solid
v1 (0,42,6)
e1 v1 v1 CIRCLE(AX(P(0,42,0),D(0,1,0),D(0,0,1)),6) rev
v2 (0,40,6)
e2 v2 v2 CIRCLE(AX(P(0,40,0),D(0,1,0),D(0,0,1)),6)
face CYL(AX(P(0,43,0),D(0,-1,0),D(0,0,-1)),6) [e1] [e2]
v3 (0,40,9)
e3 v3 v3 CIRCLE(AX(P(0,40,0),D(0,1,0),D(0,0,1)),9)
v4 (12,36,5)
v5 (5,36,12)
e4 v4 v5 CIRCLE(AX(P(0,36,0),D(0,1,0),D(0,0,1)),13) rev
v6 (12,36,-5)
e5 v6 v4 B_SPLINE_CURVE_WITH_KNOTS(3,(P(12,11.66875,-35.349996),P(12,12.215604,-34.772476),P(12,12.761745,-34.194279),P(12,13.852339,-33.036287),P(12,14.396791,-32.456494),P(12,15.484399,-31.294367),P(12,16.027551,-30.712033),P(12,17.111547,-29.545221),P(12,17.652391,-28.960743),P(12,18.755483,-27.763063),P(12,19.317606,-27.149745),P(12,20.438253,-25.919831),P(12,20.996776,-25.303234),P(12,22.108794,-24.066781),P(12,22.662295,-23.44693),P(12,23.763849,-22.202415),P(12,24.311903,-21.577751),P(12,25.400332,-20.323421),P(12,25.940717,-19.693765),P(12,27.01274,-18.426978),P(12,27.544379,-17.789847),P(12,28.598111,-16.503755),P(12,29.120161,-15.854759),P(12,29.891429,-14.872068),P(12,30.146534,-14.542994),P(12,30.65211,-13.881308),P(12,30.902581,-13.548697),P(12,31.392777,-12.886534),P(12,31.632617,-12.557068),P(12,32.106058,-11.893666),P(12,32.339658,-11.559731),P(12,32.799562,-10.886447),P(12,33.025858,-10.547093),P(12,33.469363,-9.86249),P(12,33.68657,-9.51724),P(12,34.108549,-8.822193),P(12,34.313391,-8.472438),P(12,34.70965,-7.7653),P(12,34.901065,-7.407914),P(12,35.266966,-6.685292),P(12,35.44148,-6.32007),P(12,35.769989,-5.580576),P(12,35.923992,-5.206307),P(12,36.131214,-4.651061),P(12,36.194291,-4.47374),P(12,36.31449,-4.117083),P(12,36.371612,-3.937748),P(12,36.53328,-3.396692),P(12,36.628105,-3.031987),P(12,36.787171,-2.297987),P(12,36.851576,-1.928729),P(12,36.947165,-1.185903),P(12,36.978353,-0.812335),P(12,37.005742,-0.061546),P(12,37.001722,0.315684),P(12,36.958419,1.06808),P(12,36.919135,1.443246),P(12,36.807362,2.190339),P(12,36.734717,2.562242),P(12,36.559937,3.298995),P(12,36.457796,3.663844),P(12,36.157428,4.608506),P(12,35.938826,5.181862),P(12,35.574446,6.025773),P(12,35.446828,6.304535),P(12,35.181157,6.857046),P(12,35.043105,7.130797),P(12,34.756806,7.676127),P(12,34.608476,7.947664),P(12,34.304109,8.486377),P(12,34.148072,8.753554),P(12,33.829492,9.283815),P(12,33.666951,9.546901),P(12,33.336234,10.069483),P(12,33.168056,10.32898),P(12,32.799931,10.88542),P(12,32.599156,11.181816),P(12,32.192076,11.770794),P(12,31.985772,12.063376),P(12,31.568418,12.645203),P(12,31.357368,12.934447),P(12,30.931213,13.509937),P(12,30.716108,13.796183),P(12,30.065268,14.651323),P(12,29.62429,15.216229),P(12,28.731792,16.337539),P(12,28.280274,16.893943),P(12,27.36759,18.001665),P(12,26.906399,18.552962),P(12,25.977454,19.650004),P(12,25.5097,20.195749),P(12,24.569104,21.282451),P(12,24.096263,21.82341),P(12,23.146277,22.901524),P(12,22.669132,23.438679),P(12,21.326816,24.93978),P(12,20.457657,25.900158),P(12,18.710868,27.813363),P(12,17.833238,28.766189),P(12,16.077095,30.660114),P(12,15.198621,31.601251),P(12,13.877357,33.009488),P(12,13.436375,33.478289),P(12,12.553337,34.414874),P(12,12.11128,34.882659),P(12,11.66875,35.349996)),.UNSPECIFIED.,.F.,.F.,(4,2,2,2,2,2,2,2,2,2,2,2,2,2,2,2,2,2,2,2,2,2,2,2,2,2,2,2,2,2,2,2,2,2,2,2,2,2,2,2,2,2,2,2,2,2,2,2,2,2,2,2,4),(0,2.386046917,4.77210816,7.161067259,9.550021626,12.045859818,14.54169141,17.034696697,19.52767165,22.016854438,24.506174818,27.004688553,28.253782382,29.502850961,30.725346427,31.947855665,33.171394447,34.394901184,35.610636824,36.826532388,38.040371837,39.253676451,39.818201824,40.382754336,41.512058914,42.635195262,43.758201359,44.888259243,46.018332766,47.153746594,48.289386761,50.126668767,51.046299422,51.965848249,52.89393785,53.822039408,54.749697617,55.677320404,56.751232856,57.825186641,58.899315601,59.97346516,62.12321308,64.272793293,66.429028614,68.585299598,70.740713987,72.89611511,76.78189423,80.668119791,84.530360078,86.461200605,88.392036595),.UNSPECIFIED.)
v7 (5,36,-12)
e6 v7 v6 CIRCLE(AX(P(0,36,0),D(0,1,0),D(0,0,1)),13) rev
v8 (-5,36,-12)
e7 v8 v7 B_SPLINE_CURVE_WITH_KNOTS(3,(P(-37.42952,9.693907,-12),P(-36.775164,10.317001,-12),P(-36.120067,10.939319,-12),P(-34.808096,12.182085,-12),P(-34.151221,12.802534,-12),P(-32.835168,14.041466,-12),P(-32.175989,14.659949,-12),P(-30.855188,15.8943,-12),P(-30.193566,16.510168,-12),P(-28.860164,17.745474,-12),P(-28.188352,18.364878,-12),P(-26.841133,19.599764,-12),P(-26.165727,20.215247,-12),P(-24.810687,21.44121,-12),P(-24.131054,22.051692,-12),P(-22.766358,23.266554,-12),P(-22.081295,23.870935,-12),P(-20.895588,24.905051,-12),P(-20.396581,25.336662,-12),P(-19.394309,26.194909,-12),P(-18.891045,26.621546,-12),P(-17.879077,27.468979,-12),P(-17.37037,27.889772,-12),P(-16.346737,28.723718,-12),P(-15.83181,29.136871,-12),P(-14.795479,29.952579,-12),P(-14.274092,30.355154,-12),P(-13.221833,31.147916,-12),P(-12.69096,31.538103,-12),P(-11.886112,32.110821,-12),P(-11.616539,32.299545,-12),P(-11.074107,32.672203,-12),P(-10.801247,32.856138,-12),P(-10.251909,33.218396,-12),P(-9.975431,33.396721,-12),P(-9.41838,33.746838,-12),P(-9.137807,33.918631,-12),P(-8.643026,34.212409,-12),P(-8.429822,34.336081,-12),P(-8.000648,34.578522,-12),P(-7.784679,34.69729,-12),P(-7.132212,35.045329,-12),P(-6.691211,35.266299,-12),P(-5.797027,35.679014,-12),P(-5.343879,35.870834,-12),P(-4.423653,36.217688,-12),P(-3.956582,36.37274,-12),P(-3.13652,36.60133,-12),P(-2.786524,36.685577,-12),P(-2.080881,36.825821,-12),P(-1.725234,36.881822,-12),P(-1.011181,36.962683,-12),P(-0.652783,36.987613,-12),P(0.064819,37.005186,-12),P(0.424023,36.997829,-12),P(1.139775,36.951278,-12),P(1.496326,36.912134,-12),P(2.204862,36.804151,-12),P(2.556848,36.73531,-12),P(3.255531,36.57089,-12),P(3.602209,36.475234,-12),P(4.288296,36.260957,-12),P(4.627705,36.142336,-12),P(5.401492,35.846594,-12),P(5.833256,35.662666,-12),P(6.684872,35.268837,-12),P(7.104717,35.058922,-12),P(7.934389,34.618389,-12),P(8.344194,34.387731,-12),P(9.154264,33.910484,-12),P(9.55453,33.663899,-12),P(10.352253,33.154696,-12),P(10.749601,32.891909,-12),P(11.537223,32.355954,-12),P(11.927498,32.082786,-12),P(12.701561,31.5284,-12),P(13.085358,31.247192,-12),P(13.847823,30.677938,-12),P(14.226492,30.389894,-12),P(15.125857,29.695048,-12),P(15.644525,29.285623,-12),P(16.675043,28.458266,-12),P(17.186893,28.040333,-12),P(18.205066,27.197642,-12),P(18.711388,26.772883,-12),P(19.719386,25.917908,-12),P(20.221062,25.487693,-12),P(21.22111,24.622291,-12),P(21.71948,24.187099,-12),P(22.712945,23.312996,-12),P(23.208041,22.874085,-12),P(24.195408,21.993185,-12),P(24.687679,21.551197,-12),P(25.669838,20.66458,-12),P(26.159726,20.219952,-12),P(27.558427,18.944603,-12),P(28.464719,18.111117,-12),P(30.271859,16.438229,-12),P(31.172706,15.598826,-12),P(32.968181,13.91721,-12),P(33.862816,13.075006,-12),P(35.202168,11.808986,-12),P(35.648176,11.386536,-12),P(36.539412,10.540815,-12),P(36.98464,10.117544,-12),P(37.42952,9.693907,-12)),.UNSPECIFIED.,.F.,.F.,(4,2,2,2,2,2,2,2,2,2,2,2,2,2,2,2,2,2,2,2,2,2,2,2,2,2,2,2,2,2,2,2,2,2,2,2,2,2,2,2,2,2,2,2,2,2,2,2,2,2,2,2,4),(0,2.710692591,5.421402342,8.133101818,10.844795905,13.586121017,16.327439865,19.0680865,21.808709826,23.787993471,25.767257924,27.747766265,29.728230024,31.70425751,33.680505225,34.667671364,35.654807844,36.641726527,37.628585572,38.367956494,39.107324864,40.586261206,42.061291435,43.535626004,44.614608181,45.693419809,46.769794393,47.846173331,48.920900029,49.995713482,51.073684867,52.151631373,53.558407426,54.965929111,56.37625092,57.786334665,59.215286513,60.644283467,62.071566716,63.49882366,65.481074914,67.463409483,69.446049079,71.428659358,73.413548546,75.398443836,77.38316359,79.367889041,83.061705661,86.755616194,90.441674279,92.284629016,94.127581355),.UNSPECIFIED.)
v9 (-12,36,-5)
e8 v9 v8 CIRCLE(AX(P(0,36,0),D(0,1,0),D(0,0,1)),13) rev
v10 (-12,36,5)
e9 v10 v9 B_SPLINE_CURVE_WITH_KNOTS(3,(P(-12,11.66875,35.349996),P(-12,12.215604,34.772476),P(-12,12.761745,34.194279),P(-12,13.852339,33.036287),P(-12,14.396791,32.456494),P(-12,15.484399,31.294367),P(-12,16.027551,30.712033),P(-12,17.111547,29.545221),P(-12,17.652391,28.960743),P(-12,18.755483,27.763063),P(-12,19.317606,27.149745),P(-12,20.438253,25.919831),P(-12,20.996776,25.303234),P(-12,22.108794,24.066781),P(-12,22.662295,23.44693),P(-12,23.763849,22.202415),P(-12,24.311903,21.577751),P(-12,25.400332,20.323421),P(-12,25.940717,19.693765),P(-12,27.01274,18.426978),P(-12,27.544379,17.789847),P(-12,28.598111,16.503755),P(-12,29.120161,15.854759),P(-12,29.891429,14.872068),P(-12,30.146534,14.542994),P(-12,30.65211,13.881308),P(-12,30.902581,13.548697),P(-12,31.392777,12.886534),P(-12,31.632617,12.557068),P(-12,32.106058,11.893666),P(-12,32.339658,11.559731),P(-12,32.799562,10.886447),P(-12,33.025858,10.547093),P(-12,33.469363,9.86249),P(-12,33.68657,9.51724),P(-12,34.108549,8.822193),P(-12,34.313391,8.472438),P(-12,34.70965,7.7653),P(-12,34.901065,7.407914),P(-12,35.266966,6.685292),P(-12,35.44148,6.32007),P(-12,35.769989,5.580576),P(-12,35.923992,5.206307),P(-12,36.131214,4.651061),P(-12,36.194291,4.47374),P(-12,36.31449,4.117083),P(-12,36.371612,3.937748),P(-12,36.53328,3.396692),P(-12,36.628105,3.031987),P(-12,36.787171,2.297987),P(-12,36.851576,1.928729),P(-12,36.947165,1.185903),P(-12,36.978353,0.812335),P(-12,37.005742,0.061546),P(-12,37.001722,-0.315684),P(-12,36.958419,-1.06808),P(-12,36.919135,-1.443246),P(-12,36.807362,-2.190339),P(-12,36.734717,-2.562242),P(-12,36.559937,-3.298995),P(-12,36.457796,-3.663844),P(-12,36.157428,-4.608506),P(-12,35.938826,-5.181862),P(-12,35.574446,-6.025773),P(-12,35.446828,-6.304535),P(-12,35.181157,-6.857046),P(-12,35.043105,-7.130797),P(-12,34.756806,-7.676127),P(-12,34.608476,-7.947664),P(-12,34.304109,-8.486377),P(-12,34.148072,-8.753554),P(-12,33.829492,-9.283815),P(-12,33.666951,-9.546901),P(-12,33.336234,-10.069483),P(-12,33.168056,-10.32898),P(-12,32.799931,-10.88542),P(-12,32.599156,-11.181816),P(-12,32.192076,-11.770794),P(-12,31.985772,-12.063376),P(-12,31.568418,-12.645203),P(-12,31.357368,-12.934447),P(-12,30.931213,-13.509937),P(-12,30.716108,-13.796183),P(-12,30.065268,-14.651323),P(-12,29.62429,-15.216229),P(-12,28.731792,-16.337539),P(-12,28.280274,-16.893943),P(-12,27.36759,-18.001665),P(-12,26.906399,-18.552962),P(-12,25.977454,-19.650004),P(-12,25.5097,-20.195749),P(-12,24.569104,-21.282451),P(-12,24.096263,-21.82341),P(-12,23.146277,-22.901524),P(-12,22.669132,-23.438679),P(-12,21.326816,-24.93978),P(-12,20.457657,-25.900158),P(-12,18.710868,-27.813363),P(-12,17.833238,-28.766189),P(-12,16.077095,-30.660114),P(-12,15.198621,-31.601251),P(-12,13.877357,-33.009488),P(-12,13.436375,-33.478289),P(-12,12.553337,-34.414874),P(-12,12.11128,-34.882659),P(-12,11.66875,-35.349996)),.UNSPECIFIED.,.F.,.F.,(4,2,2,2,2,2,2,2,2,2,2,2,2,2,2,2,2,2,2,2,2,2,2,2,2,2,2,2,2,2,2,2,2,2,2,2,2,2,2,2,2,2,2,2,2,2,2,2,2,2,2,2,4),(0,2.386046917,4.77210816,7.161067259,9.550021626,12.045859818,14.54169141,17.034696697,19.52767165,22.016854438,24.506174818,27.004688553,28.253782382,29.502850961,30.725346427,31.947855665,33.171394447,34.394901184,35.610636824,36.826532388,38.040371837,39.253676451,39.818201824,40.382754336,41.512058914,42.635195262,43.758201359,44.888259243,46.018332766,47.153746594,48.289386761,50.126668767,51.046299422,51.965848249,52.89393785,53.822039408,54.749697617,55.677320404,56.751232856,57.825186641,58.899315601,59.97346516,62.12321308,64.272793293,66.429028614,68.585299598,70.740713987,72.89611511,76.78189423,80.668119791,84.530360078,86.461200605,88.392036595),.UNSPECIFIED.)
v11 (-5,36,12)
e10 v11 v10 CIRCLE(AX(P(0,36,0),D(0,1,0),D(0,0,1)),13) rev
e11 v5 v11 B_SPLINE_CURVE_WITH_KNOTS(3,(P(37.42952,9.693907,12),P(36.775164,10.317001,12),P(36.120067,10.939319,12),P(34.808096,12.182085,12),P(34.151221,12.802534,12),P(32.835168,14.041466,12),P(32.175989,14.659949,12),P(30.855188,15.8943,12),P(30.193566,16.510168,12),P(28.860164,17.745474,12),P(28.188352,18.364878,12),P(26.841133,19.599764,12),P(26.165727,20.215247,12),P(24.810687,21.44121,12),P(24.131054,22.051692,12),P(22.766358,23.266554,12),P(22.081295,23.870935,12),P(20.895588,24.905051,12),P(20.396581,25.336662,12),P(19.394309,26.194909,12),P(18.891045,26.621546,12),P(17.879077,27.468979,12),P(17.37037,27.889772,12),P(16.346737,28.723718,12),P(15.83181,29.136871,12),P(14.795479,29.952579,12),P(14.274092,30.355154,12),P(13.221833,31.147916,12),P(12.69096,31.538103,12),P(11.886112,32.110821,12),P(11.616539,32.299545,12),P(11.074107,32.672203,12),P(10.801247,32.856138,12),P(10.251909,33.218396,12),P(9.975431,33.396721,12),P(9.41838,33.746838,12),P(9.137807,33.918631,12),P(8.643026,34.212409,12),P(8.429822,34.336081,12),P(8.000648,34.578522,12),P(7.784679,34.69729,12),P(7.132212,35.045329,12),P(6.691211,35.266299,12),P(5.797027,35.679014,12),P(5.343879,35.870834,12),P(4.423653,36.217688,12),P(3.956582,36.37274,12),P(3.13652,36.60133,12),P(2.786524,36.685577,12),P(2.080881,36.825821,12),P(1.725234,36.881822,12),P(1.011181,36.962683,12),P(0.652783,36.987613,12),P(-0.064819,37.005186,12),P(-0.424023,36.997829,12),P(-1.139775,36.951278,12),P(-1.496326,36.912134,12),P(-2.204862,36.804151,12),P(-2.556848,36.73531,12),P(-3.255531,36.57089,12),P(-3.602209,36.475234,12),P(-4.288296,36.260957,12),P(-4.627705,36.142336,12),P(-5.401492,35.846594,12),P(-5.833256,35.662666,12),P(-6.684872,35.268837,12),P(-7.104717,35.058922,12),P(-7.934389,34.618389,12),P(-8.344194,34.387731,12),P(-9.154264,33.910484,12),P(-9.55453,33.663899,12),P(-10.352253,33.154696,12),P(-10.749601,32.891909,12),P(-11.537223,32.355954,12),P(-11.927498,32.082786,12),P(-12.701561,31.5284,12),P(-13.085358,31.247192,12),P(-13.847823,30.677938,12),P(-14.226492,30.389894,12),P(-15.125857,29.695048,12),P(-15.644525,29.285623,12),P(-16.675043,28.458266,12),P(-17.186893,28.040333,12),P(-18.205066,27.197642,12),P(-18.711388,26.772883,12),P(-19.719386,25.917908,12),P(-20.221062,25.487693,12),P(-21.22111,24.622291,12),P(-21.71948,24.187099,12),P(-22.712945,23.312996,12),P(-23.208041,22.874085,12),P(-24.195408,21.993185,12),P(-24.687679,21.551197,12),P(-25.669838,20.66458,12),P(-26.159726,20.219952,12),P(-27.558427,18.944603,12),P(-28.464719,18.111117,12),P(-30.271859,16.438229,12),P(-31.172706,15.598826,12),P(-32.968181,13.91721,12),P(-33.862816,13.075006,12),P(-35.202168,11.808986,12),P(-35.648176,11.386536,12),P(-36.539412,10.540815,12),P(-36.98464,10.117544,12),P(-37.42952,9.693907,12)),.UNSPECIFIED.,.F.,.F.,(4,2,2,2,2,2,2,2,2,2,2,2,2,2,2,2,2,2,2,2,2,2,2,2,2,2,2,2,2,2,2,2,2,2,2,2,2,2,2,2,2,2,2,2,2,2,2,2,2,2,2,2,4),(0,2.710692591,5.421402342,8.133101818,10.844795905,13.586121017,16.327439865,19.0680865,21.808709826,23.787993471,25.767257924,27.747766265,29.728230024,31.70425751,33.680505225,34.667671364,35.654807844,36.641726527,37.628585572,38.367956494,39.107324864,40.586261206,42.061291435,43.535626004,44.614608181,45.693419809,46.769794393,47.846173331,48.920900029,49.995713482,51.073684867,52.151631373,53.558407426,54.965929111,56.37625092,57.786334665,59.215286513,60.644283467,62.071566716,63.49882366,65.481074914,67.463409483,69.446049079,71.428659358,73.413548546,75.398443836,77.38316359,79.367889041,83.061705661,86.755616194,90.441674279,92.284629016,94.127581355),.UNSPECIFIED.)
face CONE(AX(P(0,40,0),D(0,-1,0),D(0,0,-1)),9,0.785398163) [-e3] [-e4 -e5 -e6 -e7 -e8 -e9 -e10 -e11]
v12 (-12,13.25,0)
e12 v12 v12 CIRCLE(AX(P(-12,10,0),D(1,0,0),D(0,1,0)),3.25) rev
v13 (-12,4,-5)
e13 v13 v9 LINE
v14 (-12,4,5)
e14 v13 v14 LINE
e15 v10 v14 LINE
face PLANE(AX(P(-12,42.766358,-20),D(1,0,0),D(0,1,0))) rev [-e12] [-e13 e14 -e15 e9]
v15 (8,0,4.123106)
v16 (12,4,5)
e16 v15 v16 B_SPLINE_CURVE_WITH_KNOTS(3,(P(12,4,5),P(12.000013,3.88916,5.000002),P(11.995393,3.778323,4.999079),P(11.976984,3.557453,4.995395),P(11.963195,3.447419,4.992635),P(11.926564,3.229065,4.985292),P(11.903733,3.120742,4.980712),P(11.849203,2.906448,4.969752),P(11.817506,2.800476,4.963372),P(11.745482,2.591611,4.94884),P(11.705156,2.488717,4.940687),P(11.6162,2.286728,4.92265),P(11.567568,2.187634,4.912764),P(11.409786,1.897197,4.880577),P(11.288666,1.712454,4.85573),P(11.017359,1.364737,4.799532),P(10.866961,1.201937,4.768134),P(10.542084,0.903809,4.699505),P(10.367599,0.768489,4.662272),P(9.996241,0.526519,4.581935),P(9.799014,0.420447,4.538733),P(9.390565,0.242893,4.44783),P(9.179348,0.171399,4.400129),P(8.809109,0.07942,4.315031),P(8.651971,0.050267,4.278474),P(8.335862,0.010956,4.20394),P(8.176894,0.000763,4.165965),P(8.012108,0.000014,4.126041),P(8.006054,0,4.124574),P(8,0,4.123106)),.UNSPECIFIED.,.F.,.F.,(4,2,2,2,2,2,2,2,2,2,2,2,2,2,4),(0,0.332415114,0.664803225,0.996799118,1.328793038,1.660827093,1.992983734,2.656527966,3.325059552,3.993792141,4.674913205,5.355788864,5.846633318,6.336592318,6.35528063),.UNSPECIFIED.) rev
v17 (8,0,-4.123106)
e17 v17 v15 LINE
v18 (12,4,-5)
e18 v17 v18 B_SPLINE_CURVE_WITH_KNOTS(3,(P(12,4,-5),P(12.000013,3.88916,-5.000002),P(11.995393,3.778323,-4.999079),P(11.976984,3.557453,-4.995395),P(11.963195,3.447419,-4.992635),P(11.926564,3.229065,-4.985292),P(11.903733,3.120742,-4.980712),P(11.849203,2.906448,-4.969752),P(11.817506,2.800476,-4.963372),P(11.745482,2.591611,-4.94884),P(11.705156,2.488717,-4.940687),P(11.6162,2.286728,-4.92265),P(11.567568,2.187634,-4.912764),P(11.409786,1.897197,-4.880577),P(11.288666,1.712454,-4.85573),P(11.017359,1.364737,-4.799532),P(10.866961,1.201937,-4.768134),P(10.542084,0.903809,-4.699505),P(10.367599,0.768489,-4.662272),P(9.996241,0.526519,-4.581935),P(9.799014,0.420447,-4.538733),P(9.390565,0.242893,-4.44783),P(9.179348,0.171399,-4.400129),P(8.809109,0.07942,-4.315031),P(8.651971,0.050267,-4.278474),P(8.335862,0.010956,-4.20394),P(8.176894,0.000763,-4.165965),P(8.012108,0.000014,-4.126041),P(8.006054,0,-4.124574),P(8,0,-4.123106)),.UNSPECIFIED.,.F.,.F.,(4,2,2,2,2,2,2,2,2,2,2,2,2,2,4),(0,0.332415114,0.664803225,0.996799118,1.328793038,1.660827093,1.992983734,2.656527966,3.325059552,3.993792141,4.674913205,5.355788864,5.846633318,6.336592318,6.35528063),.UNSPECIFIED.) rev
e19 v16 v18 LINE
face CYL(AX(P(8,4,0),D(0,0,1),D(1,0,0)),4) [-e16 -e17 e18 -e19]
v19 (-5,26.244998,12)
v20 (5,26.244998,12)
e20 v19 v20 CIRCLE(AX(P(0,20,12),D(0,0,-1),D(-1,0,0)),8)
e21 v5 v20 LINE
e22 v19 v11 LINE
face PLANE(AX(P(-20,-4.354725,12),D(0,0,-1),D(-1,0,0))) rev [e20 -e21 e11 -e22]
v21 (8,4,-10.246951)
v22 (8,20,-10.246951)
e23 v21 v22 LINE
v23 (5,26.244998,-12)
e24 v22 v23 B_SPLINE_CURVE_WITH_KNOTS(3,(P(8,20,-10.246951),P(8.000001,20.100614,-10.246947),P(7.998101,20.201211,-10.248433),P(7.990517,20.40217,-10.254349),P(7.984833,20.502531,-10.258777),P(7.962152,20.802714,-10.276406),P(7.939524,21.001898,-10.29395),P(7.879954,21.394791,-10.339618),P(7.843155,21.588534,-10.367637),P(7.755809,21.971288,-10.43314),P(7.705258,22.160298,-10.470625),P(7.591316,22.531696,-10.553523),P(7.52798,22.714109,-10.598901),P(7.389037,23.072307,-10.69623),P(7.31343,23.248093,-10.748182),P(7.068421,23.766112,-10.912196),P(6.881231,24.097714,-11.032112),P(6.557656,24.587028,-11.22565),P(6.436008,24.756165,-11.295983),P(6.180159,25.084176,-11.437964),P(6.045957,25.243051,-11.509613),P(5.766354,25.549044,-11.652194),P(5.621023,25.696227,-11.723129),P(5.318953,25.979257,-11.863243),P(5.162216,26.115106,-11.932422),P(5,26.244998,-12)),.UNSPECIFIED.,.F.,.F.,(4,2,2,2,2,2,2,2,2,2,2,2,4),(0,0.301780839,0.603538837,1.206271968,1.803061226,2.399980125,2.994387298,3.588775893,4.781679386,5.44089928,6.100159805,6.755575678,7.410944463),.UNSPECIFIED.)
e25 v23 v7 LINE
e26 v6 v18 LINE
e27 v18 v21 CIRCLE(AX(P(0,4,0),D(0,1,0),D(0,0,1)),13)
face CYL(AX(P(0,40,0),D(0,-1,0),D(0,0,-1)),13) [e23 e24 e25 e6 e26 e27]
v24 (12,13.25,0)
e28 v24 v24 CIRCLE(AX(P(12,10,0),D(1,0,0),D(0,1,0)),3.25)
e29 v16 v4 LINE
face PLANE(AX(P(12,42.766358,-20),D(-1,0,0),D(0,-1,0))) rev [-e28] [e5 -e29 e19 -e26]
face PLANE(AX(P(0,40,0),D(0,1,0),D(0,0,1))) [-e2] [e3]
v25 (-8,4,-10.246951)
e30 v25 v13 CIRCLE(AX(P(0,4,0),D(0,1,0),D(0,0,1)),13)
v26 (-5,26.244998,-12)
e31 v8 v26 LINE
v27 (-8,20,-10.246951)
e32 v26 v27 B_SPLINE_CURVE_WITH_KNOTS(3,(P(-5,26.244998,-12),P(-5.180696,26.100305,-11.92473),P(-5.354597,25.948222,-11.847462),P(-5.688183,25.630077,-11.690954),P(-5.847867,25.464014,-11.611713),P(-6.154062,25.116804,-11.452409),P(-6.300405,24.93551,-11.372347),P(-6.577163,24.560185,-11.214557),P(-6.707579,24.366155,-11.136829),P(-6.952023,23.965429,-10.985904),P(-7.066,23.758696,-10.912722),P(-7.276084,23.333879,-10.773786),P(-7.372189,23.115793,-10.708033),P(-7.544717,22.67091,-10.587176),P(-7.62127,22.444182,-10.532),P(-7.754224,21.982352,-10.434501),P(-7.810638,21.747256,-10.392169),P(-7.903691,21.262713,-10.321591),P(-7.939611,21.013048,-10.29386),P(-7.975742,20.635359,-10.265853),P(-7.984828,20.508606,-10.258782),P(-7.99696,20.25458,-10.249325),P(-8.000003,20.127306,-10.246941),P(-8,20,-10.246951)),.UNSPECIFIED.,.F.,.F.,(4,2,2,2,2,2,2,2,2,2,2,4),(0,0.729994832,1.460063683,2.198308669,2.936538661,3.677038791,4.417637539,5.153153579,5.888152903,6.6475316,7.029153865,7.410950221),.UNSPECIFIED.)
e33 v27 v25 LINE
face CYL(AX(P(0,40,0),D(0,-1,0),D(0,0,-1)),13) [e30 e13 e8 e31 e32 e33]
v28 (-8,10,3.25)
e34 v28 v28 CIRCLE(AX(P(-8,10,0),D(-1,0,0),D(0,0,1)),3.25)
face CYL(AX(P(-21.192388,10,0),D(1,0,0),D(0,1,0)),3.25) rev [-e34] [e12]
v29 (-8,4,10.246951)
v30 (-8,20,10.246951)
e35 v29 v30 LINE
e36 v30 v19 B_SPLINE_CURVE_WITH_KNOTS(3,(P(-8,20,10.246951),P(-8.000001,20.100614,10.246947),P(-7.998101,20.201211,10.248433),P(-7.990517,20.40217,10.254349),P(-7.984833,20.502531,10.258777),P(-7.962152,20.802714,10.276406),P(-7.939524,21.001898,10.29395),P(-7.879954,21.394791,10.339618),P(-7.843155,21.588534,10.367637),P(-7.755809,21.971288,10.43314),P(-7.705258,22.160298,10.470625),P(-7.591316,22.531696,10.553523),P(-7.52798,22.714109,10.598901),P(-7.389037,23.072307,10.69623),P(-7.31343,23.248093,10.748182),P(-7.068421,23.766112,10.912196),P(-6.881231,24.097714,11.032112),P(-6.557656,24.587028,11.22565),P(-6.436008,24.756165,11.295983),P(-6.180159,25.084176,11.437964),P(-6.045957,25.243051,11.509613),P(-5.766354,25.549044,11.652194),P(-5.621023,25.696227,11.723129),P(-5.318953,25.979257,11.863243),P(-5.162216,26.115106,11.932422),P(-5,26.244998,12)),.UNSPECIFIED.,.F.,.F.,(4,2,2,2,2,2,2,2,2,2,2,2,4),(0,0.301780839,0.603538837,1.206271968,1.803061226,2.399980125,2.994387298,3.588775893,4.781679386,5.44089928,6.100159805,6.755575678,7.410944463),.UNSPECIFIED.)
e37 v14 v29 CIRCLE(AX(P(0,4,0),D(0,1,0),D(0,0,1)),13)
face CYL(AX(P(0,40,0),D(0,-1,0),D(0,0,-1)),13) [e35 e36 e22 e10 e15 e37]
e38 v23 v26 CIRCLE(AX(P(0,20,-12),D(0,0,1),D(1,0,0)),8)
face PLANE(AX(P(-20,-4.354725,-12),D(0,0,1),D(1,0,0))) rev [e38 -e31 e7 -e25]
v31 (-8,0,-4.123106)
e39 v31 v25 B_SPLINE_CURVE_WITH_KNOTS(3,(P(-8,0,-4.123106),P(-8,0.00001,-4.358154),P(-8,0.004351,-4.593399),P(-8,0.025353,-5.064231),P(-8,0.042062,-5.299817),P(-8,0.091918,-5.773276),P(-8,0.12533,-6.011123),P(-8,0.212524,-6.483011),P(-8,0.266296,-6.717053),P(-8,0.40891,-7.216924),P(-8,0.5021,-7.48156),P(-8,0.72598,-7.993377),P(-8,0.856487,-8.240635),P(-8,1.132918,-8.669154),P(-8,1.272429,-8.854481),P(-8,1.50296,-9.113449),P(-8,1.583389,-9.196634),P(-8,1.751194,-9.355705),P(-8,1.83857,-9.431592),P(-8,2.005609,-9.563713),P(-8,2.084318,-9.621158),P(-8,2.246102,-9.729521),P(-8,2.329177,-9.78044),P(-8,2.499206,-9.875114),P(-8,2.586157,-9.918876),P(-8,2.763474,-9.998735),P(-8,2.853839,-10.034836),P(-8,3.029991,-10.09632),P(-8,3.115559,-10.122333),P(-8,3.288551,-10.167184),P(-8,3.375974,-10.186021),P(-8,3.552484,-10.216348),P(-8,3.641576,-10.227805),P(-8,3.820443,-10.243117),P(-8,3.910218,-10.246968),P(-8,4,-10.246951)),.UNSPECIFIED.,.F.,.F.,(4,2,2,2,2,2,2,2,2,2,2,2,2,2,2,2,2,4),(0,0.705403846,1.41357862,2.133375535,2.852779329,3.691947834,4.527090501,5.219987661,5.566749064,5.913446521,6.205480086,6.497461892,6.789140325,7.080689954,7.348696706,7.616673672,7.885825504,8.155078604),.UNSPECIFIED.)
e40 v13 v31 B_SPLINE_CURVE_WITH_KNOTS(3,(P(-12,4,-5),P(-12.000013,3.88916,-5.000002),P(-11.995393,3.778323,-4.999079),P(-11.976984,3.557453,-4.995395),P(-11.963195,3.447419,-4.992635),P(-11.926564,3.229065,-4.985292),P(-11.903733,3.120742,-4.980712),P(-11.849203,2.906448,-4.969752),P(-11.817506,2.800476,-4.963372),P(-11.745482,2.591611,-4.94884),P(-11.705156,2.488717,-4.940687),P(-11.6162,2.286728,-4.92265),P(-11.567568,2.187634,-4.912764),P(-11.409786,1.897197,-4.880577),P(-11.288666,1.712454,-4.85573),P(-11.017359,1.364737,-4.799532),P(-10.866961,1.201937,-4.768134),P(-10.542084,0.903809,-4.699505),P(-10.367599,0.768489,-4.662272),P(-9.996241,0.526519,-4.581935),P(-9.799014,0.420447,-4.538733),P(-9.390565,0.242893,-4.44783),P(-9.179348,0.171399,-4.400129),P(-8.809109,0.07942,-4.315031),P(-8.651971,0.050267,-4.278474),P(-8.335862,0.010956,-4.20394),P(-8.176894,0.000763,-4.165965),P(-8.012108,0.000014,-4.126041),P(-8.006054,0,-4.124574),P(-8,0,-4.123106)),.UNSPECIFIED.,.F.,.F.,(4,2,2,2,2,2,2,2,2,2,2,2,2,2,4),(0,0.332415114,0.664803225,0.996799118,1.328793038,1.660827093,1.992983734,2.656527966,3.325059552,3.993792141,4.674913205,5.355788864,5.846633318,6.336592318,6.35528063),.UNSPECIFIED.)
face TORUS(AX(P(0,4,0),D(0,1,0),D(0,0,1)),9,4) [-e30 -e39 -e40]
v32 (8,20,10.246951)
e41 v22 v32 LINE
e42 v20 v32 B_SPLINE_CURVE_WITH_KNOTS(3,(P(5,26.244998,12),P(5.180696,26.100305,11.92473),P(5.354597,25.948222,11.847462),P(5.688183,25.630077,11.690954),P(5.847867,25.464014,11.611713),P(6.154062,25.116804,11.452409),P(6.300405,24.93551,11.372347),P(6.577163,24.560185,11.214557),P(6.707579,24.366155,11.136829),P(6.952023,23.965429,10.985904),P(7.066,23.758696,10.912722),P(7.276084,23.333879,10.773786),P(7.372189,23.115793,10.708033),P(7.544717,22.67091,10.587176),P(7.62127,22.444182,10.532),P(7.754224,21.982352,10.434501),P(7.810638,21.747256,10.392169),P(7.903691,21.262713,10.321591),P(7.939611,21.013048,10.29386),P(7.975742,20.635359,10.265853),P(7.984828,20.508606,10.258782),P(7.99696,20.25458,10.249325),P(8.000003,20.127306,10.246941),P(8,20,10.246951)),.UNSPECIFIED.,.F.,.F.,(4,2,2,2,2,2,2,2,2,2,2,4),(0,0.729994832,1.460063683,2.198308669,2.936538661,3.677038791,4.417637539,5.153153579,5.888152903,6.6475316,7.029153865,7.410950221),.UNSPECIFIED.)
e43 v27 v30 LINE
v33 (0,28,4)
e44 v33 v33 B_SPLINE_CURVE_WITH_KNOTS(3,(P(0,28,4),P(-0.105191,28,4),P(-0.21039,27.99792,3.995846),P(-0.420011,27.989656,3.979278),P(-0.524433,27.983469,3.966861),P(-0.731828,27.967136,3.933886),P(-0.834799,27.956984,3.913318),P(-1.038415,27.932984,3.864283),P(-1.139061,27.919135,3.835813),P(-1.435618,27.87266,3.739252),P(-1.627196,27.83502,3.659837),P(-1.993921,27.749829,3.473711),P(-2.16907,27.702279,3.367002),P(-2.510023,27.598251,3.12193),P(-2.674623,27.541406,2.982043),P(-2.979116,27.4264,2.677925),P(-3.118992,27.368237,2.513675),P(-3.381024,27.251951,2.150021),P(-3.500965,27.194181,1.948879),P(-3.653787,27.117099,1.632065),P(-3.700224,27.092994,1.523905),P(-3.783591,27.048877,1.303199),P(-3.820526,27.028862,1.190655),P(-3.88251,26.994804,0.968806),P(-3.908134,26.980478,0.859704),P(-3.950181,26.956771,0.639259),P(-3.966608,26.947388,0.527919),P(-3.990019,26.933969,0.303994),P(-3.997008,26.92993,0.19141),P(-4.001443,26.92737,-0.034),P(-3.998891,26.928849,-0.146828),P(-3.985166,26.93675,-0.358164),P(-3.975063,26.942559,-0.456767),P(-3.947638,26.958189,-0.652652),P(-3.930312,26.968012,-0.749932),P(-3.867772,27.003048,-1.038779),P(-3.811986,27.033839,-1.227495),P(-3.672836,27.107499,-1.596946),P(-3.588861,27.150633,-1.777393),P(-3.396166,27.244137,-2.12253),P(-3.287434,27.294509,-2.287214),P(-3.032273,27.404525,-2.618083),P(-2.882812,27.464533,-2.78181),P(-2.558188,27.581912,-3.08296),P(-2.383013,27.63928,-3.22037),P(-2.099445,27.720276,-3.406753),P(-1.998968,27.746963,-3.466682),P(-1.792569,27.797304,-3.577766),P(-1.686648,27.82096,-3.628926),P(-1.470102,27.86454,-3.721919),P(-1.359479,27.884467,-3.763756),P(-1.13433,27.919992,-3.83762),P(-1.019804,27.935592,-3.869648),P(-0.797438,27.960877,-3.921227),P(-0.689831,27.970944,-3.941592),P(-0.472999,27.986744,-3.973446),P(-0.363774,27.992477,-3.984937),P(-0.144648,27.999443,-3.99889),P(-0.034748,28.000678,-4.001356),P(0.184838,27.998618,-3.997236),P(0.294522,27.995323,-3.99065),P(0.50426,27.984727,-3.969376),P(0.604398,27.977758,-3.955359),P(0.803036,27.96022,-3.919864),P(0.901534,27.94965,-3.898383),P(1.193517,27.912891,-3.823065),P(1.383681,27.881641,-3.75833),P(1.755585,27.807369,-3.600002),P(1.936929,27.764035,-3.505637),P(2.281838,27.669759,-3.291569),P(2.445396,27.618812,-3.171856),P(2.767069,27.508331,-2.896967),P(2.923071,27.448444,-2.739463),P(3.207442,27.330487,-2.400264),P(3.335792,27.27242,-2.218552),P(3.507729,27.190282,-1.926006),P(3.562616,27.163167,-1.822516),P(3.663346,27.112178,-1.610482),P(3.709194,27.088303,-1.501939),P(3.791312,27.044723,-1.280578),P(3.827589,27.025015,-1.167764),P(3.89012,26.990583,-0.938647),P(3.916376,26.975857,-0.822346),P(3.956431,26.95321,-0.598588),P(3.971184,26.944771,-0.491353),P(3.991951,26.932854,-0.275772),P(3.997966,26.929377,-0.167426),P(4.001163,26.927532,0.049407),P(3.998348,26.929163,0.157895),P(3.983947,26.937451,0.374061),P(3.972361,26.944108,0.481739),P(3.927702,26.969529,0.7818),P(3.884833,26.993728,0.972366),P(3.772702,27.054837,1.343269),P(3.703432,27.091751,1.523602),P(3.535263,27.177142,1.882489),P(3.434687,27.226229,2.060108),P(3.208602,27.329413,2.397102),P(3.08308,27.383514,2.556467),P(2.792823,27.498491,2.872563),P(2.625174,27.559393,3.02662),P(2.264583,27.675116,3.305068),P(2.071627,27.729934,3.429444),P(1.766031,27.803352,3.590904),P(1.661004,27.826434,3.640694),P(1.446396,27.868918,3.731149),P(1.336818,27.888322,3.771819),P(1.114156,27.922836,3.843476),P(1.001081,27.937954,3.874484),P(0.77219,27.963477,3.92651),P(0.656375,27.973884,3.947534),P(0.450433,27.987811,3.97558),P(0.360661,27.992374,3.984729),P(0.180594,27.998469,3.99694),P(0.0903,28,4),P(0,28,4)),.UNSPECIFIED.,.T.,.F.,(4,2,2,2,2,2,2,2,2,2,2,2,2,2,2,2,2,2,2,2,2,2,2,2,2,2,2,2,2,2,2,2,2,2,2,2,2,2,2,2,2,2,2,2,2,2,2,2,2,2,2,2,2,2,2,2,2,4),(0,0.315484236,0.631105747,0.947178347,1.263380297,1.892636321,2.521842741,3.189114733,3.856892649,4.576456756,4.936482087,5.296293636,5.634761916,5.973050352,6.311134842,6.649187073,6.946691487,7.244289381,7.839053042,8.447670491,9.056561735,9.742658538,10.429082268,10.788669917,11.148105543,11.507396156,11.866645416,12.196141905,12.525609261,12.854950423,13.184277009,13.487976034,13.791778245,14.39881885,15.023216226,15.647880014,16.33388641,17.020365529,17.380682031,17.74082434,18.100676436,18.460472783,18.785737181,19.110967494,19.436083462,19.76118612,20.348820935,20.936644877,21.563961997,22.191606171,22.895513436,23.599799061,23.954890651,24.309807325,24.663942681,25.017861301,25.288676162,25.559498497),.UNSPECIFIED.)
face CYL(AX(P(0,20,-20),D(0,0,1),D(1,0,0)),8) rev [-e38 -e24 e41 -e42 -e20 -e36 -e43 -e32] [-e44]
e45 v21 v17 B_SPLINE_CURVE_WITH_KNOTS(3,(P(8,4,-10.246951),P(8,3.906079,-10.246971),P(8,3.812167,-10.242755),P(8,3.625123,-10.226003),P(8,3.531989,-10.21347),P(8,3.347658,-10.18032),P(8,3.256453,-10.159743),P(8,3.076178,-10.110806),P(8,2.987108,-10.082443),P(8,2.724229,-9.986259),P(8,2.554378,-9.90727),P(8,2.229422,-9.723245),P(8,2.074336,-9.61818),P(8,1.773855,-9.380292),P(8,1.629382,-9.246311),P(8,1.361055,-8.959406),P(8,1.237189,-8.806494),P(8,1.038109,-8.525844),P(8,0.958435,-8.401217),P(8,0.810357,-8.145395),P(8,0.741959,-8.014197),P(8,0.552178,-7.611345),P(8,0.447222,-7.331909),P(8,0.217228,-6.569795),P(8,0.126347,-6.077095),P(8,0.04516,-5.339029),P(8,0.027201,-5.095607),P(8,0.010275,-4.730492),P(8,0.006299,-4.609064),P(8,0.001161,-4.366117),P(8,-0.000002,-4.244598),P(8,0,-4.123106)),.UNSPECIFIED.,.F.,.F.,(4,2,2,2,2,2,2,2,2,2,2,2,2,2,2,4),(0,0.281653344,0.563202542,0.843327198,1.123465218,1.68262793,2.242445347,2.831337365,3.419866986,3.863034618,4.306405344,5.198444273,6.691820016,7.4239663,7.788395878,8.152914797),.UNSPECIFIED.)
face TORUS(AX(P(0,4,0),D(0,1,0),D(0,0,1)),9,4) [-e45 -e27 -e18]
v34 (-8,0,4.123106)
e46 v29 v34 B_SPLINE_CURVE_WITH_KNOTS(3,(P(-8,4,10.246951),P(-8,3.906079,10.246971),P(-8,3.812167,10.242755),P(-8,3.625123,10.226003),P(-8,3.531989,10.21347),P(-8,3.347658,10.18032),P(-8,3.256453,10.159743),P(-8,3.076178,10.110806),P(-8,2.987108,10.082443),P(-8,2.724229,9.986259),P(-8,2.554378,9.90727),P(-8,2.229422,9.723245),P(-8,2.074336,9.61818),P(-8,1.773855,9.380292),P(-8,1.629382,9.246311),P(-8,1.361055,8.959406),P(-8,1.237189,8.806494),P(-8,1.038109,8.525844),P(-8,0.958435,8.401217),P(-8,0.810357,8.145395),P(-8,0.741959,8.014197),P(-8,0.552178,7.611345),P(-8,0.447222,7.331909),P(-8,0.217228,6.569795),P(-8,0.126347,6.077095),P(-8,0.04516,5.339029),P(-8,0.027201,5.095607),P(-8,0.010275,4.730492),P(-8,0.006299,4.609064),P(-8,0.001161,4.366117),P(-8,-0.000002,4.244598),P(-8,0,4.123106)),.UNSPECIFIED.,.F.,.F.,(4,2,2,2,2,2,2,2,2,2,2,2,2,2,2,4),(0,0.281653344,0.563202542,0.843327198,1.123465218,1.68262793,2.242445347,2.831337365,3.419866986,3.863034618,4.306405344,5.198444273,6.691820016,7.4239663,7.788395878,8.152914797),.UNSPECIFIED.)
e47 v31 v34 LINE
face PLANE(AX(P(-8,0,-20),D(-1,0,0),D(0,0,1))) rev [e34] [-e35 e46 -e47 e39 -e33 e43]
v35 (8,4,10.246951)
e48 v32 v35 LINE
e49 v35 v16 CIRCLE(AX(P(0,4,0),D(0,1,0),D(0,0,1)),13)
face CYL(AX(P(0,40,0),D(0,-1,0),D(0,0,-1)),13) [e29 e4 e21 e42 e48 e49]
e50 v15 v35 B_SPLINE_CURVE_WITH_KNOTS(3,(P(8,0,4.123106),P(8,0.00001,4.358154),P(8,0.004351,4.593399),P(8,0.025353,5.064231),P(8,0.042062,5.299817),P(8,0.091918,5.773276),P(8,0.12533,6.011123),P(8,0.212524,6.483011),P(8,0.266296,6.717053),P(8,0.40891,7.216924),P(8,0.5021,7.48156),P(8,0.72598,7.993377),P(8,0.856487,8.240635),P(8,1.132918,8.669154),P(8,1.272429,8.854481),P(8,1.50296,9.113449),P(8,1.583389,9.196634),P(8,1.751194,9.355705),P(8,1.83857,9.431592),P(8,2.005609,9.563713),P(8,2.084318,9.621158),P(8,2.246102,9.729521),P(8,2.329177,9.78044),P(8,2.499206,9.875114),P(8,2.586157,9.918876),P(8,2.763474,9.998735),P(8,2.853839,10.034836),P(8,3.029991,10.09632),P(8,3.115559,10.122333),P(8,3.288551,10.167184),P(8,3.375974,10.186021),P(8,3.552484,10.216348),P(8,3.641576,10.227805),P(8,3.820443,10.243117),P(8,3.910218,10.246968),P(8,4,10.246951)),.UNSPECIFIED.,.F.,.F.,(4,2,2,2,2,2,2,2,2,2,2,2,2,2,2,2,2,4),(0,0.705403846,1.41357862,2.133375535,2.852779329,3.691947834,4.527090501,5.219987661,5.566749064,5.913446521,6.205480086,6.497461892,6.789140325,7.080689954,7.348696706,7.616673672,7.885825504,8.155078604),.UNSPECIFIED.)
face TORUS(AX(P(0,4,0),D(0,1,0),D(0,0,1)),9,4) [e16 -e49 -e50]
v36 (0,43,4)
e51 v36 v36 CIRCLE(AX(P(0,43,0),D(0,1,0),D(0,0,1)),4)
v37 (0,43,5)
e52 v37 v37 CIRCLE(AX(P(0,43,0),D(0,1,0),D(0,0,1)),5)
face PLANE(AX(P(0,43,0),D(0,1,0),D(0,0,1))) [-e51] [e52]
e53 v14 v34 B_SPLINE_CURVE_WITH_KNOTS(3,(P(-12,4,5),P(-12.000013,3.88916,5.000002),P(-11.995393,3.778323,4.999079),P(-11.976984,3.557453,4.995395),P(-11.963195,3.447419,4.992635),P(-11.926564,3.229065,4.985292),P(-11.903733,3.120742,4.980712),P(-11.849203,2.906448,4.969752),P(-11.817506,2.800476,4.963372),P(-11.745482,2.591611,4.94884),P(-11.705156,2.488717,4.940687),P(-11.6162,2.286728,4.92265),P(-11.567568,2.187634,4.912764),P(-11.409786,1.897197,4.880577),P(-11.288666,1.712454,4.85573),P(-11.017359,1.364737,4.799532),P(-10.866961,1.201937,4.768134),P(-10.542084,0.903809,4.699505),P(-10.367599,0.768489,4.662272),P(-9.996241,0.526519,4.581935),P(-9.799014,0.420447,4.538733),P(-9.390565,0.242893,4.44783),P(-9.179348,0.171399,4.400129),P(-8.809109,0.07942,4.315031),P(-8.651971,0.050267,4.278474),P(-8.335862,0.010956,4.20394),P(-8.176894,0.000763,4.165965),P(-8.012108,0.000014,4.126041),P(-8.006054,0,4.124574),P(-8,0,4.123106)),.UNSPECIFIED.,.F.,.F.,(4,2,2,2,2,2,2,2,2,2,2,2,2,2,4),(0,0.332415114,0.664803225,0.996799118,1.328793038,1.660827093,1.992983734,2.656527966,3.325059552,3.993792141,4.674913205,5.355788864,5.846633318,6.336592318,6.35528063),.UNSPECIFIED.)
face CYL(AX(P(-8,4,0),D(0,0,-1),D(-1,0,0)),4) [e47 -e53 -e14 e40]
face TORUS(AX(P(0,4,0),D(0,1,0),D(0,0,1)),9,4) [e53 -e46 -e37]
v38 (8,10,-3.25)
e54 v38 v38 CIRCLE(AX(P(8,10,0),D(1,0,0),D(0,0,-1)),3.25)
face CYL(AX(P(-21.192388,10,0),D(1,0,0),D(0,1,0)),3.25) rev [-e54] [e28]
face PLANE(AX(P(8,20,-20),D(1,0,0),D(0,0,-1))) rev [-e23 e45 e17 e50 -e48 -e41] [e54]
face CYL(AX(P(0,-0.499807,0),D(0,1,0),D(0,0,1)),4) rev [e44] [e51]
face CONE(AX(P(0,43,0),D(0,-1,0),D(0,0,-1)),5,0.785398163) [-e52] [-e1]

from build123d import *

# Parameters (mm, degrees)
SKETCH1_R               = 13
BOSS_EXTRUDE1_DEPTH     = 40
CHAMFER1_SIZE           = 4
SKETCH2_W               = 9.245775376
SKETCH2_H               = 49.025160165
CUT_EXTRUDE1_DEPTH      = 20
SKETCH3_W               = 9.286622431
SKETCH3_H               = 52.181973662
CUT_EXTRUDE2_DEPTH      = 20
CUT_EXTRUDE3_DEPTH      = 20
FILLET9_R               = 4
CUT_EXTRUDE4_REACH      = 50.166
SKETCH5_R               = 3.25
SKETCH6_R               = 6
BOSS_EXTRUDE2_DEPTH     = 3
CUT_EXTRUDE5_REACH      = 48.228
CUT_EXTRUDE5_END_RADIUS = 8
SKETCH7_R               = 4
CHAMFER2_SIZE           = 1


with BuildPart() as part:
    # Sketch1 → Boss-Extrude1 (new body)
    with BuildSketch(Plane(origin=(0, 0, 0), x_dir=(1, 0, 0), z_dir=(0, 1, 0))):
        with Locations(Location((0, 0, 0), (0, 0, 270))):
            Circle(SKETCH1_R)
    extrude(amount=BOSS_EXTRUDE1_DEPTH)

    # Chamfer1
    chamfer1_edges = [part.edges().sort_by_distance(p)[0] for p in [
        (0, 40, -13),
    ]]
    chamfer(chamfer1_edges, length=CHAMFER1_SIZE)

    # Sketch2 → Cut-Extrude1 (cut, symmetric)
    with BuildSketch(Plane(origin=(0, 0, 0), x_dir=(0, 0, -1), z_dir=(1, 0, 0))):
        with Locations((-16.622887688, 20.157854701)):
            Rectangle(SKETCH2_W, SKETCH2_H)
        with Locations((16.622887688, 20.157854701)):
            Rectangle(SKETCH2_W, SKETCH2_H)
    extrude(amount=CUT_EXTRUDE1_DEPTH, both=True, mode=Mode.SUBTRACT)

    # Sketch3 → Cut-Extrude2 (cut, symmetric)
    with BuildSketch(Plane.XY):
        with Locations((16.643311215, 16.67537129)):
            Rectangle(SKETCH3_W, SKETCH3_H)
        with Locations((-16.643311215, 16.67537129)):
            Rectangle(SKETCH3_W, SKETCH3_H)
    extrude(amount=CUT_EXTRUDE2_DEPTH, both=True, mode=Mode.SUBTRACT)

    # Sketch4 → Cut-Extrude3 (cut, symmetric)
    with BuildSketch(Plane.XY):
        with BuildLine():
            Line((8, 20), (8, 0))
            Line((8, 0), (-8, 0))
            Line((-8, 0), (-8, 20))
            ThreePointArc((-8, 20), (0, 28), (8, 20))
        make_face()
    extrude(amount=CUT_EXTRUDE3_DEPTH, both=True, mode=Mode.SUBTRACT)

    # Fillet9
    # the kernel refuses this fillet: 4 mm, written as the material it takes off along each edge
    with BuildSketch(Plane(origin=(0, 0, 0), x_dir=(0.9307006586833979, 0, 0.3657817435661457), z_dir=(-0.3657817435661457, 0, 0.9307006586833979))) as fillet9_piece_1:
        with BuildLine():
            CenterArc((13 - FILLET9_R, FILLET9_R), FILLET9_R, 270, 90)
            Line((13 - FILLET9_R, 0), (13, 0))
            Line((13, 0), (13, FILLET9_R))
        make_face()
    revolve(axis=Axis((0, 0, 0), (0, 1, 0)), revolution_arc=117.551393411, mode=Mode.SUBTRACT)
    with BuildSketch(Plane(origin=(0, 0, 0), x_dir=(-0.9307006586833977, 0, -0.36578174356614573), z_dir=(0.36578174356614573, 0, -0.9307006586833977))) as fillet9_piece_2:
        with BuildLine():
            CenterArc((13 - FILLET9_R, FILLET9_R), FILLET9_R, 270, 90)
            Line((13, FILLET9_R), (13, 0))
            Line((13, 0), (13 - FILLET9_R, 0))
        make_face()
    revolve(axis=Axis((0, 0, 0), (0, 1, 0)), revolution_arc=117.551393411, mode=Mode.SUBTRACT)
    with BuildSketch(Plane(origin=(12, 0, -15), x_dir=(0, 1, 0), z_dir=(0, 0, 1)), Plane(origin=(-12, 0, -15), x_dir=(1, 0, 0), z_dir=(0, 0, 1))) as fillet9_piece_3:
        with BuildLine():
            CenterArc((FILLET9_R, FILLET9_R), FILLET9_R, 180, 90)
            Line((0, FILLET9_R), (0, 0))
            Line((0, 0), (FILLET9_R, 0))
        make_face()
    extrude(amount=30, mode=Mode.SUBTRACT)
    with BuildSketch(Plane(origin=(0, 0, 0), x_dir=(-0.1061893245847588, 0, 0.9943459294150264), z_dir=(-0.9943459294150264, 0, -0.1061893245847588))) as fillet9_piece_4:
        with BuildLine():
            CenterArc((13 - FILLET9_R, FILLET9_R), FILLET9_R, 270, 90)
            Line((13 - FILLET9_R, 0), (13, 0))
            Line((13, 0), (13, FILLET9_R))
        make_face()
    revolve(axis=Axis((0, 0, 0), (0, 1, 0)), revolution_arc=117.551393411, mode=Mode.SUBTRACT)
    with BuildSketch(Plane(origin=(0, 0, 0), x_dir=(0.10618932458475924, 0, -0.9943459294150264), z_dir=(0.9943459294150264, 0, 0.10618932458475924))) as fillet9_piece_5:
        with BuildLine():
            CenterArc((13 - FILLET9_R, FILLET9_R), FILLET9_R, 270, 90)
            Line((13 - FILLET9_R, 0), (13, 0))
            Line((13, 0), (13, FILLET9_R))
        make_face()
    revolve(axis=Axis((0, 0, 0), (0, 1, 0)), revolution_arc=117.551393411, mode=Mode.SUBTRACT)

    # Cut-Extrude4: up to this face of the body (flat: up to its plane)
    cut_extrude4_end = Plane(part.part.faces().sort_by_distance((-12, 20.3320271, 0))[0])
    # Sketch5 → Cut-Extrude4 (cut, up to the picked face)
    with BuildSketch(Plane(origin=(12, 0, 0), x_dir=(0, 0, -1), z_dir=(1, 0, 0)), mode=Mode.PRIVATE) as cut_extrude4_sk1:
        with Locations(Location((0, 10, 0), (0, 0, 90))):
            Circle(SKETCH5_R)
    cut_extrude4_tool1 = split(extrude(cut_extrude4_sk1.sketch, amount=-CUT_EXTRUDE4_REACH, mode=Mode.PRIVATE), bisect_by=cut_extrude4_end, keep=Keep.BOTH, mode=Mode.PRIVATE)
    add(cut_extrude4_tool1.solids().sort_by(Axis((12, 10, 0), (-1, 0, 0)))[0], mode=Mode.SUBTRACT)

    # Sketch6 → Boss-Extrude2 (add)
    with BuildSketch(Plane(origin=(0, 40, 0), x_dir=(1, 0, 0), z_dir=(0, 1, 0))):
        with Locations(Location((0, 0, 0), (0, 0, 270))):
            Circle(SKETCH6_R)
    extrude(amount=BOSS_EXTRUDE2_DEPTH)

    # Cut-Extrude5: up to this cylinder (the profile starts outside it)
    cut_extrude5_end = Plane(origin=(0, 20, 0), z_dir=(0, 0, 1)) * Cylinder(CUT_EXTRUDE5_END_RADIUS, 113.456, mode=Mode.PRIVATE)
    # Sketch7 → Cut-Extrude5 (cut, up to the surface)
    with BuildSketch(Plane(origin=(0, 43, 0), x_dir=(1, 0, 0), z_dir=(0, 1, 0)), mode=Mode.PRIVATE) as cut_extrude5_sk1:
        with Locations(Location((0, 0, 0), (0, 0, 270))):
            Circle(SKETCH7_R)
    cut_extrude5_tool1 = extrude(cut_extrude5_sk1.sketch, amount=-CUT_EXTRUDE5_REACH, mode=Mode.PRIVATE) - cut_extrude5_end
    add(cut_extrude5_tool1.solids().sort_by_distance((0, 43, 0))[0], mode=Mode.SUBTRACT)

    # Chamfer2
    chamfer2_edges = [part.edges().sort_by_distance(p)[0] for p in [
        (0, 43, -6),
    ]]
    chamfer(chamfer2_edges, length=CHAMFER2_SIZE)


solid = part.part
